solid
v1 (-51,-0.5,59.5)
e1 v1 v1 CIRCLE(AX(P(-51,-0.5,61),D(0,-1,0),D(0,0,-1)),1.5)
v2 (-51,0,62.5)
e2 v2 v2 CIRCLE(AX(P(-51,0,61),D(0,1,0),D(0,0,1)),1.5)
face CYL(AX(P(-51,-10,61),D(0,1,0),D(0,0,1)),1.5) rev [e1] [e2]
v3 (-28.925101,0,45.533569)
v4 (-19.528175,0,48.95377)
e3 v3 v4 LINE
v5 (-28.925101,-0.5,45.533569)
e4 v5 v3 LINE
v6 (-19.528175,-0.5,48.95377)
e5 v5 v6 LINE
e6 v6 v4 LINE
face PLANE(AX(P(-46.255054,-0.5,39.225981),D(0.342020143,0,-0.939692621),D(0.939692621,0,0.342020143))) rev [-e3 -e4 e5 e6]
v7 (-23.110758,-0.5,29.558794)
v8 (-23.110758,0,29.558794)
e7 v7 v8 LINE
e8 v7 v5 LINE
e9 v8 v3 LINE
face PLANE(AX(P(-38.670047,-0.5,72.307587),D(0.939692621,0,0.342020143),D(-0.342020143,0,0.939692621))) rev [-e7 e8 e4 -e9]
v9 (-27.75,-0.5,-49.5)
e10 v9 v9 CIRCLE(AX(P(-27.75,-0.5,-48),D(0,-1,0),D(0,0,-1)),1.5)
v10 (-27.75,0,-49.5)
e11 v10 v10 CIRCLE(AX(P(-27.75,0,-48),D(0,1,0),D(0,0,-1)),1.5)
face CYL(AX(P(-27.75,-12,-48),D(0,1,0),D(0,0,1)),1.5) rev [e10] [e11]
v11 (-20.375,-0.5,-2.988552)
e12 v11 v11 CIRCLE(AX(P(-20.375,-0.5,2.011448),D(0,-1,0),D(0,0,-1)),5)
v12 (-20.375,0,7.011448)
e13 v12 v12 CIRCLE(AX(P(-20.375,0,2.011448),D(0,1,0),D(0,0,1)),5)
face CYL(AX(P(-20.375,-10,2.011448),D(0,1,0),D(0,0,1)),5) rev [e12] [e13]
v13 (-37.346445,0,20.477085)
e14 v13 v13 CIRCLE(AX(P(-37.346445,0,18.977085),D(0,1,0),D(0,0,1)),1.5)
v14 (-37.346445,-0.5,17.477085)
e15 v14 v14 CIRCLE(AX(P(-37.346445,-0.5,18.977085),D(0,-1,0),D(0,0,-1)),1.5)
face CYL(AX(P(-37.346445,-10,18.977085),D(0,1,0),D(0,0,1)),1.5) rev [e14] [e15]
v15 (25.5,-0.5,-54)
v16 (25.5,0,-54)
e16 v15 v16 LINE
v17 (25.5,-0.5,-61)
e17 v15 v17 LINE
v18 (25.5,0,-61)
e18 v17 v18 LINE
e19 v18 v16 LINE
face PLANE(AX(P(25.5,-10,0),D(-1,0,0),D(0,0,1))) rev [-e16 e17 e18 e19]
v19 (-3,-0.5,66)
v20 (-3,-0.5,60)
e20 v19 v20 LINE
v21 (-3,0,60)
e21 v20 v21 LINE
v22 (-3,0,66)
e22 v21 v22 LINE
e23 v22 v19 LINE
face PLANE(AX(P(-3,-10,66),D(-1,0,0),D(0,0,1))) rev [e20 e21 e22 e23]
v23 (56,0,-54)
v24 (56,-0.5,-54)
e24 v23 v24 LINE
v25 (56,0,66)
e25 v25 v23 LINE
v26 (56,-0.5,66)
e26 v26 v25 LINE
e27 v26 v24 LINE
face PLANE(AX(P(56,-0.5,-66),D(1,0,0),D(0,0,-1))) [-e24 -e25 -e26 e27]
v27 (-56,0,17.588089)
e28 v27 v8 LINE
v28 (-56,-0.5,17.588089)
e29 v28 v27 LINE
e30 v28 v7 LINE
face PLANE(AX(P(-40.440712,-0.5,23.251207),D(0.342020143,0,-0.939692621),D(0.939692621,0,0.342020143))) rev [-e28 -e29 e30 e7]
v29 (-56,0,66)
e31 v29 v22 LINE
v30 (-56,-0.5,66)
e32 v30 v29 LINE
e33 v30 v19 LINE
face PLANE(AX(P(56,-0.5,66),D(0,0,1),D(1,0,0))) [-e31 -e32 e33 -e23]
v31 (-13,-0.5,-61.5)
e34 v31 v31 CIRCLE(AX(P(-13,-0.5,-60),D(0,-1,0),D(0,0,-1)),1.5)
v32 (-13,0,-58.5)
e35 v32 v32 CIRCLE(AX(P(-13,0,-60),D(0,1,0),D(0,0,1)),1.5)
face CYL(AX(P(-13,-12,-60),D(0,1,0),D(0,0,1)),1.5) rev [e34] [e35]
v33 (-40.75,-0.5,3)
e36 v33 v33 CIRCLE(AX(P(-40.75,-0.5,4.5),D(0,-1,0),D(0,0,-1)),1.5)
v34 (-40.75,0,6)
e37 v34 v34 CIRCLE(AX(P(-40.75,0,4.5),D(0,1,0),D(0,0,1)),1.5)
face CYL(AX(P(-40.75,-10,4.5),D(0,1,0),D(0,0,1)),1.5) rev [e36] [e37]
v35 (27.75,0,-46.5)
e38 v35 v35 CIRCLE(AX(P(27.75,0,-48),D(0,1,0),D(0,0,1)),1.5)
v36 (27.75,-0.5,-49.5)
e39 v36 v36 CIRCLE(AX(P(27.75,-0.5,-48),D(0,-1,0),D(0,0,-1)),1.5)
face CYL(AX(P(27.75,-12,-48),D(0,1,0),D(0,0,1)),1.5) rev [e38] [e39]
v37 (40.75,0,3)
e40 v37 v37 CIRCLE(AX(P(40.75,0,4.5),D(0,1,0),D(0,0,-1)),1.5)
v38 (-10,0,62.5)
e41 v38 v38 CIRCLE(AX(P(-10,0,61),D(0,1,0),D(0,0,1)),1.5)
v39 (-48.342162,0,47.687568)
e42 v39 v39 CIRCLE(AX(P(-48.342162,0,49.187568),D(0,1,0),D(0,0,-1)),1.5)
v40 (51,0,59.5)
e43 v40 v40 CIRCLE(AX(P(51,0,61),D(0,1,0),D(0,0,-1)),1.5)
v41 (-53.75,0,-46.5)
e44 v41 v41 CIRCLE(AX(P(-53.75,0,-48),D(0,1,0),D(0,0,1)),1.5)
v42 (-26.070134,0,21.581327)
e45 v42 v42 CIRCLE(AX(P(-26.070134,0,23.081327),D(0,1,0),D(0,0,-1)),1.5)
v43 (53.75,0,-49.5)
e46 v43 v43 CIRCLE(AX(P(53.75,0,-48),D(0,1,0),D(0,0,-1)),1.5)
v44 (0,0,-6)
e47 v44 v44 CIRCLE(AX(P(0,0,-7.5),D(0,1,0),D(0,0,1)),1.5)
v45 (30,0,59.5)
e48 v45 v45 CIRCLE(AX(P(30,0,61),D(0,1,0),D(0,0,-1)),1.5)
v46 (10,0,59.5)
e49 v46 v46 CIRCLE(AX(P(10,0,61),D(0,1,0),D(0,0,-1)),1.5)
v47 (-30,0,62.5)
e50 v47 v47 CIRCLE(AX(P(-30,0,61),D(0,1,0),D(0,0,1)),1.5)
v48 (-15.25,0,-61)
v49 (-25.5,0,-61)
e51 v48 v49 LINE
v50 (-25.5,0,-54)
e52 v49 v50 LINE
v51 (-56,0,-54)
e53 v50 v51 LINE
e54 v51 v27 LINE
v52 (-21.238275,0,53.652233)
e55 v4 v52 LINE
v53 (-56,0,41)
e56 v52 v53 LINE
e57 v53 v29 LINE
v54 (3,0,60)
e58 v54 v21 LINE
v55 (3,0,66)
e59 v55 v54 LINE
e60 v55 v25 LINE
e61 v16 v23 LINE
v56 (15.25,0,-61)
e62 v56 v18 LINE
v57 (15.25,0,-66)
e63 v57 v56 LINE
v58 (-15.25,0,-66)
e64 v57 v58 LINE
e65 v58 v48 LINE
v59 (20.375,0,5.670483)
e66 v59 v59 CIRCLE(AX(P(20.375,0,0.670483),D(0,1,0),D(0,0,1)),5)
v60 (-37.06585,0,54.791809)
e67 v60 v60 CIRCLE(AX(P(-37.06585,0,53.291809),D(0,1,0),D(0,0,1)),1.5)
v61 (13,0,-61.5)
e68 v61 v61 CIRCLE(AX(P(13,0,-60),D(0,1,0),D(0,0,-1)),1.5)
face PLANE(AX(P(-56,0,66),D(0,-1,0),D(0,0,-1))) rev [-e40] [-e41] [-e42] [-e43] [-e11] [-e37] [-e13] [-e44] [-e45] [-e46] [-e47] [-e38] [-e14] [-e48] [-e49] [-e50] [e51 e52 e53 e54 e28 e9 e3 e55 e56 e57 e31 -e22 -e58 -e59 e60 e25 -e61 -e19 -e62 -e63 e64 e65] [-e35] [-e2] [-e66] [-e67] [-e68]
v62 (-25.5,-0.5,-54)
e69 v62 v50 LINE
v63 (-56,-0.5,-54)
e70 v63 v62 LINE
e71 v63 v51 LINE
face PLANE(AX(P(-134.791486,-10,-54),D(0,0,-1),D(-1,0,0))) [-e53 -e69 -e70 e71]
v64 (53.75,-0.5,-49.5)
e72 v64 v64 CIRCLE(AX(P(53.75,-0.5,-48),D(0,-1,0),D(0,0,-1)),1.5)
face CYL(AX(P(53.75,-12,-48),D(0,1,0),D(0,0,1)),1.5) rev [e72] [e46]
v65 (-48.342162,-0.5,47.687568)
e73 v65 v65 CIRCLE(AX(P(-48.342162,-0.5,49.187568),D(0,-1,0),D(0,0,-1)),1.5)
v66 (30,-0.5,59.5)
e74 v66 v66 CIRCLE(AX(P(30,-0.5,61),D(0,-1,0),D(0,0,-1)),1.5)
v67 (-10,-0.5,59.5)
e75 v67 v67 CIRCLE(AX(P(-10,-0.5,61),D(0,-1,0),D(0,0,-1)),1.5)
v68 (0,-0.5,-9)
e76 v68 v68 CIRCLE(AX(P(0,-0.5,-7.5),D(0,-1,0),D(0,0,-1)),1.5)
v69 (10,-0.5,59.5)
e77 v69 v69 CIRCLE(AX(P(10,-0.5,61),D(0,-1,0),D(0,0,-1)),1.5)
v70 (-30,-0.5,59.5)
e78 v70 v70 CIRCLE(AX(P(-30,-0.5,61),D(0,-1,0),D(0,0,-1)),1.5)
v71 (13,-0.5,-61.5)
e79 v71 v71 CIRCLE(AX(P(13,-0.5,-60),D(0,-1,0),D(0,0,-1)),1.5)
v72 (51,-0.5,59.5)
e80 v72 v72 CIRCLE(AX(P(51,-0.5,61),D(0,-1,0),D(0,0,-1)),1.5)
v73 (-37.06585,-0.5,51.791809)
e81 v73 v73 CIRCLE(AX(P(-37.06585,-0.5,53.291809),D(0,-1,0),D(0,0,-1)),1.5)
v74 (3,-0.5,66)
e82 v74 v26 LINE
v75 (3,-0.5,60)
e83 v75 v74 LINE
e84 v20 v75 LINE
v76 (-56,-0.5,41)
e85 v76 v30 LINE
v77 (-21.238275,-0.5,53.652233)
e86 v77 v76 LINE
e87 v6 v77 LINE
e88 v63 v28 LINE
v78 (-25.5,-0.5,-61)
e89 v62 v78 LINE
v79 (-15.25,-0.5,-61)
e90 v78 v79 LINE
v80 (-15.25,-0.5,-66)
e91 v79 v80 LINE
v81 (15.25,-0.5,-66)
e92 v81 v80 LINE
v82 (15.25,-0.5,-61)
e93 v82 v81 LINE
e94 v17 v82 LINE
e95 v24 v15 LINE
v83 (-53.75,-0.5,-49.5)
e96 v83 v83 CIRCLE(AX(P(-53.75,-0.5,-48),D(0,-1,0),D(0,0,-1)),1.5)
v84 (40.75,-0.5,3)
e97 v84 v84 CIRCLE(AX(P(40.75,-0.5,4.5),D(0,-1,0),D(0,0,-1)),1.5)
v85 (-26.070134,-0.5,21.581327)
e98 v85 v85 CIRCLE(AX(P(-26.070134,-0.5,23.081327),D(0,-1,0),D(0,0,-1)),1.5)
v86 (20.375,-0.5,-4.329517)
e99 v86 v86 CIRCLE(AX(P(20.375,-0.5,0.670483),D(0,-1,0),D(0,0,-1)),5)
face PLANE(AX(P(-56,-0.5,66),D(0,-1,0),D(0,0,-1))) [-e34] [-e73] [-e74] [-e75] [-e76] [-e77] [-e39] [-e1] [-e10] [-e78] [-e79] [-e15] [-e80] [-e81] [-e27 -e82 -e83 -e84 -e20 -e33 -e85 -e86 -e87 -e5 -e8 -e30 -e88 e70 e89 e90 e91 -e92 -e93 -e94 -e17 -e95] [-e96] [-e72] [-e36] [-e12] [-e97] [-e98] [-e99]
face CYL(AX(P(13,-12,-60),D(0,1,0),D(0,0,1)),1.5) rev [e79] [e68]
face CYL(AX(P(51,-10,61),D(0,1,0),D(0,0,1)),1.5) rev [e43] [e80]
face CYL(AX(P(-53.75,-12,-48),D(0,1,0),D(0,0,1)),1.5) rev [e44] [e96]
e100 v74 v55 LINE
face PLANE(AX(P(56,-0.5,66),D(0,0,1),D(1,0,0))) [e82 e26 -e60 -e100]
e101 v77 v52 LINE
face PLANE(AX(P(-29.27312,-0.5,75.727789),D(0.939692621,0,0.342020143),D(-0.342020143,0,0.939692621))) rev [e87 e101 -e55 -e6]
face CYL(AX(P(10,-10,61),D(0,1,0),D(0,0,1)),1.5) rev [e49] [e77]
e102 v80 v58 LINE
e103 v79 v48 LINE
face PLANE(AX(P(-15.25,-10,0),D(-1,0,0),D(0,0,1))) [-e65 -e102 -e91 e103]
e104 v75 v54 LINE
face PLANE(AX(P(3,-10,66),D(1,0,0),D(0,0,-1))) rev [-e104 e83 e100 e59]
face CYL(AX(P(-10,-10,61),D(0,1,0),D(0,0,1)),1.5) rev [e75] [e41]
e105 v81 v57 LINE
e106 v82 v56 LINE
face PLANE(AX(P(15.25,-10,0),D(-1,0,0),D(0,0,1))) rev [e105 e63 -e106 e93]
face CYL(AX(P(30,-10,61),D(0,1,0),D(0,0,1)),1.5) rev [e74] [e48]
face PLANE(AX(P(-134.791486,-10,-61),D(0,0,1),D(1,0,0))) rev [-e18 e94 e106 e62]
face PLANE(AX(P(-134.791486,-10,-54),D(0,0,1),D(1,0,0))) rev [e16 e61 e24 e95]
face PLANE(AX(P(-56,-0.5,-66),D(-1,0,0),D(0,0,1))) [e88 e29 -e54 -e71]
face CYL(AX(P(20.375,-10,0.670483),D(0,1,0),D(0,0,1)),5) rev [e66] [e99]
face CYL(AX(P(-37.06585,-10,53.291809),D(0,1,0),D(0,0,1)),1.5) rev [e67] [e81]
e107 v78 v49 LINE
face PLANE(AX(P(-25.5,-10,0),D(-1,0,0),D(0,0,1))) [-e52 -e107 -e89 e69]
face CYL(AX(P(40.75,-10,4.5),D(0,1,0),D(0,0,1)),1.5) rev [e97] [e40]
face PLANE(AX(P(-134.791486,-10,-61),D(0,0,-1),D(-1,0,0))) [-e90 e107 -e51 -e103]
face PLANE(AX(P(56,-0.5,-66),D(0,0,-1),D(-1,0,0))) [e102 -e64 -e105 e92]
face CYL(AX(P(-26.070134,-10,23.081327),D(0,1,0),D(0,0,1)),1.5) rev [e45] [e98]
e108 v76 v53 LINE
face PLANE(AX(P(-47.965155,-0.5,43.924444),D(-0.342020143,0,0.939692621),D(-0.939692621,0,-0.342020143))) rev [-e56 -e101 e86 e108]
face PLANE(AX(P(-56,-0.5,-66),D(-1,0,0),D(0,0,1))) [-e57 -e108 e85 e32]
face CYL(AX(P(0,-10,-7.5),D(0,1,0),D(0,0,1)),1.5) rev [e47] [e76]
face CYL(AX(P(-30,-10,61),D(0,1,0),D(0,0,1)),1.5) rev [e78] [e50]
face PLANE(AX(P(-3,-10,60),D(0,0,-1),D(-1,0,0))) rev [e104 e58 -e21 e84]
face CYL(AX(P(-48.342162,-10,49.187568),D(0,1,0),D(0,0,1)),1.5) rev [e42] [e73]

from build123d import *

# Parameters (mm, degrees)
CROQUIS1_W             = 112
CROQUIS1_H             = 132
BRIDA_BASE1_DEPTH      = 0.5
CORTAR_EXTRUIR4_DEPTH  = 10
CROQUIS7_R             = 1.5
CORTAR_EXTRUIR5_DEPTH  = 10
CORTAR_EXTRUIR6_DEPTH  = 10
CROQUIS9_R             = 1.5
CORTAR_EXTRUIR7_DEPTH  = 12
CROQUIS10_R            = 1.5
CORTAR_EXTRUIR8_DEPTH  = 10
CROQUIS11_R            = 1.5
CORTAR_EXTRUIR9_DEPTH  = 10
CROQUIS12_W            = 6
CROQUIS12_H            = 6
CORTAR_EXTRUIR10_DEPTH = 10
CROQUIS13_R            = 5
CORTAR_EXTRUIR11_DEPTH = 10


# Sheet-metal steps are written as plain solids
with BuildPart() as part:
    # Croquis1 → Brida base1 (new body)
    with BuildSketch(Plane(origin=(0, 0, 0), x_dir=(1, 0, 0), z_dir=(0, 1, 0))):
        Rectangle(CROQUIS1_W, CROQUIS1_H)
    extrude(amount=-BRIDA_BASE1_DEPTH)

    # Croquis5 → Cortar-Extruir4 (cut)
    with BuildSketch(Plane(origin=(0, 0, 0), x_dir=(1, 0, 0), z_dir=(0, 1, 0))):
        Polygon((-15.25, 61), (-15.25, 66), (-56, 66), (-56, 54), (-25.5, 54), (-25.5, 61), align=None)
        Polygon((56, 66), (15.25, 66), (15.25, 61), (25.5, 61), (25.5, 54), (56, 54), align=None)
    extrude(amount=-CORTAR_EXTRUIR4_DEPTH, mode=Mode.SUBTRACT)

    # Croquis7 → Cortar-Extruir5 (cut)
    with BuildSketch(Plane(origin=(0, 0, 0), x_dir=(1, 0, 0), z_dir=(0, 1, 0))):
        with Locations(Location((-40.75, -4.5, 0), (0, 0, 270))):
            Circle(CROQUIS7_R)
        with Locations(Location((40.75, -4.5, 0), (0, 0, 90))):
            Circle(CROQUIS7_R)
        with Locations(Location((0, 7.5, 0), (0, 0, 270))):
            Circle(CROQUIS7_R)
    extrude(amount=-CORTAR_EXTRUIR5_DEPTH, mode=Mode.SUBTRACT)

    # Croquis8 → Cortar-Extruir6 (cut)
    with BuildSketch(Plane(origin=(0, 0, 0), x_dir=(1, 0, 0), z_dir=(0, 1, 0))):
        Polygon((-56, -17.588089006), (-56, -41), (-21.238275218, -53.652233112), (-19.528174501, -48.953770009), (-28.925100709, -45.533568575), (-23.110758272, -29.558794022), align=None)
    extrude(amount=-CORTAR_EXTRUIR6_DEPTH, mode=Mode.SUBTRACT)

    # Croquis9 → Cortar-Extruir7 (cut)
    with BuildSketch(Plane(origin=(0, 0, 0), x_dir=(1, 0, 0), z_dir=(0, 1, 0))):
        with Locations(Location((-13, 60, 0), (0, 0, 270))):
            Circle(CROQUIS9_R)
        with Locations(Location((13, 60, 0), (0, 0, 90))):
            Circle(CROQUIS9_R)
        with Locations(Location((-53.75, 48, 0), (0, 0, 270))):
            Circle(CROQUIS9_R)
        with Locations(Location((-27.75, 48, 0), (0, 0, 90))):
            Circle(CROQUIS9_R)
        with Locations(Location((27.75, 48, 0), (0, 0, 270))):
            Circle(CROQUIS9_R)
        with Locations(Location((53.75, 48, 0), (0, 0, 90))):
            Circle(CROQUIS9_R)
    extrude(amount=-CORTAR_EXTRUIR7_DEPTH, mode=Mode.SUBTRACT)

    # Croquis10 → Cortar-Extruir8 (cut)
    with BuildSketch(Plane(origin=(0, 0, 0), x_dir=(1, 0, 0), z_dir=(0, 1, 0))):
        with Locations(Location((-37.346445111, -18.977085256, 0), (0, 0, 270))):
            Circle(CROQUIS10_R)
        with Locations(Location((-26.070133662, -23.081326976, 0), (0, 0, 90))):
            Circle(CROQUIS10_R)
        with Locations(Location((-37.065850057, -53.291809483, 0), (0, 0, 270))):
            Circle(CROQUIS10_R)
        with Locations(Location((-48.342161507, -49.187567763, 0), (0, 0, 90))):
            Circle(CROQUIS10_R)
    extrude(amount=-CORTAR_EXTRUIR8_DEPTH, mode=Mode.SUBTRACT)

    # Croquis11 → Cortar-Extruir9 (cut)
    with BuildSketch(Plane(origin=(0, 0, 0), x_dir=(1, 0, 0), z_dir=(0, 1, 0))):
        with Locations(Location((-10, -61, 0), (0, 0, 270))):
            Circle(CROQUIS11_R)
        with Locations(Location((-30, -61, 0), (0, 0, 270))):
            Circle(CROQUIS11_R)
        with Locations(Location((30, -61, 0), (0, 0, 90))):
            Circle(CROQUIS11_R)
        with Locations(Location((10, -61, 0), (0, 0, 90))):
            Circle(CROQUIS11_R)
        with Locations(Location((-51, -61, 0), (0, 0, 270))):
            Circle(CROQUIS11_R)
        with Locations(Location((51, -61, 0), (0, 0, 90))):
            Circle(CROQUIS11_R)
    extrude(amount=-CORTAR_EXTRUIR9_DEPTH, mode=Mode.SUBTRACT)

    # Croquis12 → Cortar-Extruir10 (cut)
    with BuildSketch(Plane(origin=(0, 0, 0), x_dir=(1, 0, 0), z_dir=(0, 1, 0))):
        with Locations((0, -63)):
            Rectangle(CROQUIS12_W, CROQUIS12_H)
    extrude(amount=-CORTAR_EXTRUIR10_DEPTH, mode=Mode.SUBTRACT)

    # Croquis13 → Cortar-Extruir11 (cut)
    with BuildSketch(Plane(origin=(0, 0, 0), x_dir=(1, 0, 0), z_dir=(0, 1, 0))):
        with Locations(Location((-20.375, -2.011448093, 0), (0, 0, 270))):
            Circle(CROQUIS13_R)
        with Locations(Location((20.375, -0.670482698, 0), (0, 0, 270))):
            Circle(CROQUIS13_R)
    extrude(amount=-CORTAR_EXTRUIR11_DEPTH, mode=Mode.SUBTRACT)


solid = part.part
